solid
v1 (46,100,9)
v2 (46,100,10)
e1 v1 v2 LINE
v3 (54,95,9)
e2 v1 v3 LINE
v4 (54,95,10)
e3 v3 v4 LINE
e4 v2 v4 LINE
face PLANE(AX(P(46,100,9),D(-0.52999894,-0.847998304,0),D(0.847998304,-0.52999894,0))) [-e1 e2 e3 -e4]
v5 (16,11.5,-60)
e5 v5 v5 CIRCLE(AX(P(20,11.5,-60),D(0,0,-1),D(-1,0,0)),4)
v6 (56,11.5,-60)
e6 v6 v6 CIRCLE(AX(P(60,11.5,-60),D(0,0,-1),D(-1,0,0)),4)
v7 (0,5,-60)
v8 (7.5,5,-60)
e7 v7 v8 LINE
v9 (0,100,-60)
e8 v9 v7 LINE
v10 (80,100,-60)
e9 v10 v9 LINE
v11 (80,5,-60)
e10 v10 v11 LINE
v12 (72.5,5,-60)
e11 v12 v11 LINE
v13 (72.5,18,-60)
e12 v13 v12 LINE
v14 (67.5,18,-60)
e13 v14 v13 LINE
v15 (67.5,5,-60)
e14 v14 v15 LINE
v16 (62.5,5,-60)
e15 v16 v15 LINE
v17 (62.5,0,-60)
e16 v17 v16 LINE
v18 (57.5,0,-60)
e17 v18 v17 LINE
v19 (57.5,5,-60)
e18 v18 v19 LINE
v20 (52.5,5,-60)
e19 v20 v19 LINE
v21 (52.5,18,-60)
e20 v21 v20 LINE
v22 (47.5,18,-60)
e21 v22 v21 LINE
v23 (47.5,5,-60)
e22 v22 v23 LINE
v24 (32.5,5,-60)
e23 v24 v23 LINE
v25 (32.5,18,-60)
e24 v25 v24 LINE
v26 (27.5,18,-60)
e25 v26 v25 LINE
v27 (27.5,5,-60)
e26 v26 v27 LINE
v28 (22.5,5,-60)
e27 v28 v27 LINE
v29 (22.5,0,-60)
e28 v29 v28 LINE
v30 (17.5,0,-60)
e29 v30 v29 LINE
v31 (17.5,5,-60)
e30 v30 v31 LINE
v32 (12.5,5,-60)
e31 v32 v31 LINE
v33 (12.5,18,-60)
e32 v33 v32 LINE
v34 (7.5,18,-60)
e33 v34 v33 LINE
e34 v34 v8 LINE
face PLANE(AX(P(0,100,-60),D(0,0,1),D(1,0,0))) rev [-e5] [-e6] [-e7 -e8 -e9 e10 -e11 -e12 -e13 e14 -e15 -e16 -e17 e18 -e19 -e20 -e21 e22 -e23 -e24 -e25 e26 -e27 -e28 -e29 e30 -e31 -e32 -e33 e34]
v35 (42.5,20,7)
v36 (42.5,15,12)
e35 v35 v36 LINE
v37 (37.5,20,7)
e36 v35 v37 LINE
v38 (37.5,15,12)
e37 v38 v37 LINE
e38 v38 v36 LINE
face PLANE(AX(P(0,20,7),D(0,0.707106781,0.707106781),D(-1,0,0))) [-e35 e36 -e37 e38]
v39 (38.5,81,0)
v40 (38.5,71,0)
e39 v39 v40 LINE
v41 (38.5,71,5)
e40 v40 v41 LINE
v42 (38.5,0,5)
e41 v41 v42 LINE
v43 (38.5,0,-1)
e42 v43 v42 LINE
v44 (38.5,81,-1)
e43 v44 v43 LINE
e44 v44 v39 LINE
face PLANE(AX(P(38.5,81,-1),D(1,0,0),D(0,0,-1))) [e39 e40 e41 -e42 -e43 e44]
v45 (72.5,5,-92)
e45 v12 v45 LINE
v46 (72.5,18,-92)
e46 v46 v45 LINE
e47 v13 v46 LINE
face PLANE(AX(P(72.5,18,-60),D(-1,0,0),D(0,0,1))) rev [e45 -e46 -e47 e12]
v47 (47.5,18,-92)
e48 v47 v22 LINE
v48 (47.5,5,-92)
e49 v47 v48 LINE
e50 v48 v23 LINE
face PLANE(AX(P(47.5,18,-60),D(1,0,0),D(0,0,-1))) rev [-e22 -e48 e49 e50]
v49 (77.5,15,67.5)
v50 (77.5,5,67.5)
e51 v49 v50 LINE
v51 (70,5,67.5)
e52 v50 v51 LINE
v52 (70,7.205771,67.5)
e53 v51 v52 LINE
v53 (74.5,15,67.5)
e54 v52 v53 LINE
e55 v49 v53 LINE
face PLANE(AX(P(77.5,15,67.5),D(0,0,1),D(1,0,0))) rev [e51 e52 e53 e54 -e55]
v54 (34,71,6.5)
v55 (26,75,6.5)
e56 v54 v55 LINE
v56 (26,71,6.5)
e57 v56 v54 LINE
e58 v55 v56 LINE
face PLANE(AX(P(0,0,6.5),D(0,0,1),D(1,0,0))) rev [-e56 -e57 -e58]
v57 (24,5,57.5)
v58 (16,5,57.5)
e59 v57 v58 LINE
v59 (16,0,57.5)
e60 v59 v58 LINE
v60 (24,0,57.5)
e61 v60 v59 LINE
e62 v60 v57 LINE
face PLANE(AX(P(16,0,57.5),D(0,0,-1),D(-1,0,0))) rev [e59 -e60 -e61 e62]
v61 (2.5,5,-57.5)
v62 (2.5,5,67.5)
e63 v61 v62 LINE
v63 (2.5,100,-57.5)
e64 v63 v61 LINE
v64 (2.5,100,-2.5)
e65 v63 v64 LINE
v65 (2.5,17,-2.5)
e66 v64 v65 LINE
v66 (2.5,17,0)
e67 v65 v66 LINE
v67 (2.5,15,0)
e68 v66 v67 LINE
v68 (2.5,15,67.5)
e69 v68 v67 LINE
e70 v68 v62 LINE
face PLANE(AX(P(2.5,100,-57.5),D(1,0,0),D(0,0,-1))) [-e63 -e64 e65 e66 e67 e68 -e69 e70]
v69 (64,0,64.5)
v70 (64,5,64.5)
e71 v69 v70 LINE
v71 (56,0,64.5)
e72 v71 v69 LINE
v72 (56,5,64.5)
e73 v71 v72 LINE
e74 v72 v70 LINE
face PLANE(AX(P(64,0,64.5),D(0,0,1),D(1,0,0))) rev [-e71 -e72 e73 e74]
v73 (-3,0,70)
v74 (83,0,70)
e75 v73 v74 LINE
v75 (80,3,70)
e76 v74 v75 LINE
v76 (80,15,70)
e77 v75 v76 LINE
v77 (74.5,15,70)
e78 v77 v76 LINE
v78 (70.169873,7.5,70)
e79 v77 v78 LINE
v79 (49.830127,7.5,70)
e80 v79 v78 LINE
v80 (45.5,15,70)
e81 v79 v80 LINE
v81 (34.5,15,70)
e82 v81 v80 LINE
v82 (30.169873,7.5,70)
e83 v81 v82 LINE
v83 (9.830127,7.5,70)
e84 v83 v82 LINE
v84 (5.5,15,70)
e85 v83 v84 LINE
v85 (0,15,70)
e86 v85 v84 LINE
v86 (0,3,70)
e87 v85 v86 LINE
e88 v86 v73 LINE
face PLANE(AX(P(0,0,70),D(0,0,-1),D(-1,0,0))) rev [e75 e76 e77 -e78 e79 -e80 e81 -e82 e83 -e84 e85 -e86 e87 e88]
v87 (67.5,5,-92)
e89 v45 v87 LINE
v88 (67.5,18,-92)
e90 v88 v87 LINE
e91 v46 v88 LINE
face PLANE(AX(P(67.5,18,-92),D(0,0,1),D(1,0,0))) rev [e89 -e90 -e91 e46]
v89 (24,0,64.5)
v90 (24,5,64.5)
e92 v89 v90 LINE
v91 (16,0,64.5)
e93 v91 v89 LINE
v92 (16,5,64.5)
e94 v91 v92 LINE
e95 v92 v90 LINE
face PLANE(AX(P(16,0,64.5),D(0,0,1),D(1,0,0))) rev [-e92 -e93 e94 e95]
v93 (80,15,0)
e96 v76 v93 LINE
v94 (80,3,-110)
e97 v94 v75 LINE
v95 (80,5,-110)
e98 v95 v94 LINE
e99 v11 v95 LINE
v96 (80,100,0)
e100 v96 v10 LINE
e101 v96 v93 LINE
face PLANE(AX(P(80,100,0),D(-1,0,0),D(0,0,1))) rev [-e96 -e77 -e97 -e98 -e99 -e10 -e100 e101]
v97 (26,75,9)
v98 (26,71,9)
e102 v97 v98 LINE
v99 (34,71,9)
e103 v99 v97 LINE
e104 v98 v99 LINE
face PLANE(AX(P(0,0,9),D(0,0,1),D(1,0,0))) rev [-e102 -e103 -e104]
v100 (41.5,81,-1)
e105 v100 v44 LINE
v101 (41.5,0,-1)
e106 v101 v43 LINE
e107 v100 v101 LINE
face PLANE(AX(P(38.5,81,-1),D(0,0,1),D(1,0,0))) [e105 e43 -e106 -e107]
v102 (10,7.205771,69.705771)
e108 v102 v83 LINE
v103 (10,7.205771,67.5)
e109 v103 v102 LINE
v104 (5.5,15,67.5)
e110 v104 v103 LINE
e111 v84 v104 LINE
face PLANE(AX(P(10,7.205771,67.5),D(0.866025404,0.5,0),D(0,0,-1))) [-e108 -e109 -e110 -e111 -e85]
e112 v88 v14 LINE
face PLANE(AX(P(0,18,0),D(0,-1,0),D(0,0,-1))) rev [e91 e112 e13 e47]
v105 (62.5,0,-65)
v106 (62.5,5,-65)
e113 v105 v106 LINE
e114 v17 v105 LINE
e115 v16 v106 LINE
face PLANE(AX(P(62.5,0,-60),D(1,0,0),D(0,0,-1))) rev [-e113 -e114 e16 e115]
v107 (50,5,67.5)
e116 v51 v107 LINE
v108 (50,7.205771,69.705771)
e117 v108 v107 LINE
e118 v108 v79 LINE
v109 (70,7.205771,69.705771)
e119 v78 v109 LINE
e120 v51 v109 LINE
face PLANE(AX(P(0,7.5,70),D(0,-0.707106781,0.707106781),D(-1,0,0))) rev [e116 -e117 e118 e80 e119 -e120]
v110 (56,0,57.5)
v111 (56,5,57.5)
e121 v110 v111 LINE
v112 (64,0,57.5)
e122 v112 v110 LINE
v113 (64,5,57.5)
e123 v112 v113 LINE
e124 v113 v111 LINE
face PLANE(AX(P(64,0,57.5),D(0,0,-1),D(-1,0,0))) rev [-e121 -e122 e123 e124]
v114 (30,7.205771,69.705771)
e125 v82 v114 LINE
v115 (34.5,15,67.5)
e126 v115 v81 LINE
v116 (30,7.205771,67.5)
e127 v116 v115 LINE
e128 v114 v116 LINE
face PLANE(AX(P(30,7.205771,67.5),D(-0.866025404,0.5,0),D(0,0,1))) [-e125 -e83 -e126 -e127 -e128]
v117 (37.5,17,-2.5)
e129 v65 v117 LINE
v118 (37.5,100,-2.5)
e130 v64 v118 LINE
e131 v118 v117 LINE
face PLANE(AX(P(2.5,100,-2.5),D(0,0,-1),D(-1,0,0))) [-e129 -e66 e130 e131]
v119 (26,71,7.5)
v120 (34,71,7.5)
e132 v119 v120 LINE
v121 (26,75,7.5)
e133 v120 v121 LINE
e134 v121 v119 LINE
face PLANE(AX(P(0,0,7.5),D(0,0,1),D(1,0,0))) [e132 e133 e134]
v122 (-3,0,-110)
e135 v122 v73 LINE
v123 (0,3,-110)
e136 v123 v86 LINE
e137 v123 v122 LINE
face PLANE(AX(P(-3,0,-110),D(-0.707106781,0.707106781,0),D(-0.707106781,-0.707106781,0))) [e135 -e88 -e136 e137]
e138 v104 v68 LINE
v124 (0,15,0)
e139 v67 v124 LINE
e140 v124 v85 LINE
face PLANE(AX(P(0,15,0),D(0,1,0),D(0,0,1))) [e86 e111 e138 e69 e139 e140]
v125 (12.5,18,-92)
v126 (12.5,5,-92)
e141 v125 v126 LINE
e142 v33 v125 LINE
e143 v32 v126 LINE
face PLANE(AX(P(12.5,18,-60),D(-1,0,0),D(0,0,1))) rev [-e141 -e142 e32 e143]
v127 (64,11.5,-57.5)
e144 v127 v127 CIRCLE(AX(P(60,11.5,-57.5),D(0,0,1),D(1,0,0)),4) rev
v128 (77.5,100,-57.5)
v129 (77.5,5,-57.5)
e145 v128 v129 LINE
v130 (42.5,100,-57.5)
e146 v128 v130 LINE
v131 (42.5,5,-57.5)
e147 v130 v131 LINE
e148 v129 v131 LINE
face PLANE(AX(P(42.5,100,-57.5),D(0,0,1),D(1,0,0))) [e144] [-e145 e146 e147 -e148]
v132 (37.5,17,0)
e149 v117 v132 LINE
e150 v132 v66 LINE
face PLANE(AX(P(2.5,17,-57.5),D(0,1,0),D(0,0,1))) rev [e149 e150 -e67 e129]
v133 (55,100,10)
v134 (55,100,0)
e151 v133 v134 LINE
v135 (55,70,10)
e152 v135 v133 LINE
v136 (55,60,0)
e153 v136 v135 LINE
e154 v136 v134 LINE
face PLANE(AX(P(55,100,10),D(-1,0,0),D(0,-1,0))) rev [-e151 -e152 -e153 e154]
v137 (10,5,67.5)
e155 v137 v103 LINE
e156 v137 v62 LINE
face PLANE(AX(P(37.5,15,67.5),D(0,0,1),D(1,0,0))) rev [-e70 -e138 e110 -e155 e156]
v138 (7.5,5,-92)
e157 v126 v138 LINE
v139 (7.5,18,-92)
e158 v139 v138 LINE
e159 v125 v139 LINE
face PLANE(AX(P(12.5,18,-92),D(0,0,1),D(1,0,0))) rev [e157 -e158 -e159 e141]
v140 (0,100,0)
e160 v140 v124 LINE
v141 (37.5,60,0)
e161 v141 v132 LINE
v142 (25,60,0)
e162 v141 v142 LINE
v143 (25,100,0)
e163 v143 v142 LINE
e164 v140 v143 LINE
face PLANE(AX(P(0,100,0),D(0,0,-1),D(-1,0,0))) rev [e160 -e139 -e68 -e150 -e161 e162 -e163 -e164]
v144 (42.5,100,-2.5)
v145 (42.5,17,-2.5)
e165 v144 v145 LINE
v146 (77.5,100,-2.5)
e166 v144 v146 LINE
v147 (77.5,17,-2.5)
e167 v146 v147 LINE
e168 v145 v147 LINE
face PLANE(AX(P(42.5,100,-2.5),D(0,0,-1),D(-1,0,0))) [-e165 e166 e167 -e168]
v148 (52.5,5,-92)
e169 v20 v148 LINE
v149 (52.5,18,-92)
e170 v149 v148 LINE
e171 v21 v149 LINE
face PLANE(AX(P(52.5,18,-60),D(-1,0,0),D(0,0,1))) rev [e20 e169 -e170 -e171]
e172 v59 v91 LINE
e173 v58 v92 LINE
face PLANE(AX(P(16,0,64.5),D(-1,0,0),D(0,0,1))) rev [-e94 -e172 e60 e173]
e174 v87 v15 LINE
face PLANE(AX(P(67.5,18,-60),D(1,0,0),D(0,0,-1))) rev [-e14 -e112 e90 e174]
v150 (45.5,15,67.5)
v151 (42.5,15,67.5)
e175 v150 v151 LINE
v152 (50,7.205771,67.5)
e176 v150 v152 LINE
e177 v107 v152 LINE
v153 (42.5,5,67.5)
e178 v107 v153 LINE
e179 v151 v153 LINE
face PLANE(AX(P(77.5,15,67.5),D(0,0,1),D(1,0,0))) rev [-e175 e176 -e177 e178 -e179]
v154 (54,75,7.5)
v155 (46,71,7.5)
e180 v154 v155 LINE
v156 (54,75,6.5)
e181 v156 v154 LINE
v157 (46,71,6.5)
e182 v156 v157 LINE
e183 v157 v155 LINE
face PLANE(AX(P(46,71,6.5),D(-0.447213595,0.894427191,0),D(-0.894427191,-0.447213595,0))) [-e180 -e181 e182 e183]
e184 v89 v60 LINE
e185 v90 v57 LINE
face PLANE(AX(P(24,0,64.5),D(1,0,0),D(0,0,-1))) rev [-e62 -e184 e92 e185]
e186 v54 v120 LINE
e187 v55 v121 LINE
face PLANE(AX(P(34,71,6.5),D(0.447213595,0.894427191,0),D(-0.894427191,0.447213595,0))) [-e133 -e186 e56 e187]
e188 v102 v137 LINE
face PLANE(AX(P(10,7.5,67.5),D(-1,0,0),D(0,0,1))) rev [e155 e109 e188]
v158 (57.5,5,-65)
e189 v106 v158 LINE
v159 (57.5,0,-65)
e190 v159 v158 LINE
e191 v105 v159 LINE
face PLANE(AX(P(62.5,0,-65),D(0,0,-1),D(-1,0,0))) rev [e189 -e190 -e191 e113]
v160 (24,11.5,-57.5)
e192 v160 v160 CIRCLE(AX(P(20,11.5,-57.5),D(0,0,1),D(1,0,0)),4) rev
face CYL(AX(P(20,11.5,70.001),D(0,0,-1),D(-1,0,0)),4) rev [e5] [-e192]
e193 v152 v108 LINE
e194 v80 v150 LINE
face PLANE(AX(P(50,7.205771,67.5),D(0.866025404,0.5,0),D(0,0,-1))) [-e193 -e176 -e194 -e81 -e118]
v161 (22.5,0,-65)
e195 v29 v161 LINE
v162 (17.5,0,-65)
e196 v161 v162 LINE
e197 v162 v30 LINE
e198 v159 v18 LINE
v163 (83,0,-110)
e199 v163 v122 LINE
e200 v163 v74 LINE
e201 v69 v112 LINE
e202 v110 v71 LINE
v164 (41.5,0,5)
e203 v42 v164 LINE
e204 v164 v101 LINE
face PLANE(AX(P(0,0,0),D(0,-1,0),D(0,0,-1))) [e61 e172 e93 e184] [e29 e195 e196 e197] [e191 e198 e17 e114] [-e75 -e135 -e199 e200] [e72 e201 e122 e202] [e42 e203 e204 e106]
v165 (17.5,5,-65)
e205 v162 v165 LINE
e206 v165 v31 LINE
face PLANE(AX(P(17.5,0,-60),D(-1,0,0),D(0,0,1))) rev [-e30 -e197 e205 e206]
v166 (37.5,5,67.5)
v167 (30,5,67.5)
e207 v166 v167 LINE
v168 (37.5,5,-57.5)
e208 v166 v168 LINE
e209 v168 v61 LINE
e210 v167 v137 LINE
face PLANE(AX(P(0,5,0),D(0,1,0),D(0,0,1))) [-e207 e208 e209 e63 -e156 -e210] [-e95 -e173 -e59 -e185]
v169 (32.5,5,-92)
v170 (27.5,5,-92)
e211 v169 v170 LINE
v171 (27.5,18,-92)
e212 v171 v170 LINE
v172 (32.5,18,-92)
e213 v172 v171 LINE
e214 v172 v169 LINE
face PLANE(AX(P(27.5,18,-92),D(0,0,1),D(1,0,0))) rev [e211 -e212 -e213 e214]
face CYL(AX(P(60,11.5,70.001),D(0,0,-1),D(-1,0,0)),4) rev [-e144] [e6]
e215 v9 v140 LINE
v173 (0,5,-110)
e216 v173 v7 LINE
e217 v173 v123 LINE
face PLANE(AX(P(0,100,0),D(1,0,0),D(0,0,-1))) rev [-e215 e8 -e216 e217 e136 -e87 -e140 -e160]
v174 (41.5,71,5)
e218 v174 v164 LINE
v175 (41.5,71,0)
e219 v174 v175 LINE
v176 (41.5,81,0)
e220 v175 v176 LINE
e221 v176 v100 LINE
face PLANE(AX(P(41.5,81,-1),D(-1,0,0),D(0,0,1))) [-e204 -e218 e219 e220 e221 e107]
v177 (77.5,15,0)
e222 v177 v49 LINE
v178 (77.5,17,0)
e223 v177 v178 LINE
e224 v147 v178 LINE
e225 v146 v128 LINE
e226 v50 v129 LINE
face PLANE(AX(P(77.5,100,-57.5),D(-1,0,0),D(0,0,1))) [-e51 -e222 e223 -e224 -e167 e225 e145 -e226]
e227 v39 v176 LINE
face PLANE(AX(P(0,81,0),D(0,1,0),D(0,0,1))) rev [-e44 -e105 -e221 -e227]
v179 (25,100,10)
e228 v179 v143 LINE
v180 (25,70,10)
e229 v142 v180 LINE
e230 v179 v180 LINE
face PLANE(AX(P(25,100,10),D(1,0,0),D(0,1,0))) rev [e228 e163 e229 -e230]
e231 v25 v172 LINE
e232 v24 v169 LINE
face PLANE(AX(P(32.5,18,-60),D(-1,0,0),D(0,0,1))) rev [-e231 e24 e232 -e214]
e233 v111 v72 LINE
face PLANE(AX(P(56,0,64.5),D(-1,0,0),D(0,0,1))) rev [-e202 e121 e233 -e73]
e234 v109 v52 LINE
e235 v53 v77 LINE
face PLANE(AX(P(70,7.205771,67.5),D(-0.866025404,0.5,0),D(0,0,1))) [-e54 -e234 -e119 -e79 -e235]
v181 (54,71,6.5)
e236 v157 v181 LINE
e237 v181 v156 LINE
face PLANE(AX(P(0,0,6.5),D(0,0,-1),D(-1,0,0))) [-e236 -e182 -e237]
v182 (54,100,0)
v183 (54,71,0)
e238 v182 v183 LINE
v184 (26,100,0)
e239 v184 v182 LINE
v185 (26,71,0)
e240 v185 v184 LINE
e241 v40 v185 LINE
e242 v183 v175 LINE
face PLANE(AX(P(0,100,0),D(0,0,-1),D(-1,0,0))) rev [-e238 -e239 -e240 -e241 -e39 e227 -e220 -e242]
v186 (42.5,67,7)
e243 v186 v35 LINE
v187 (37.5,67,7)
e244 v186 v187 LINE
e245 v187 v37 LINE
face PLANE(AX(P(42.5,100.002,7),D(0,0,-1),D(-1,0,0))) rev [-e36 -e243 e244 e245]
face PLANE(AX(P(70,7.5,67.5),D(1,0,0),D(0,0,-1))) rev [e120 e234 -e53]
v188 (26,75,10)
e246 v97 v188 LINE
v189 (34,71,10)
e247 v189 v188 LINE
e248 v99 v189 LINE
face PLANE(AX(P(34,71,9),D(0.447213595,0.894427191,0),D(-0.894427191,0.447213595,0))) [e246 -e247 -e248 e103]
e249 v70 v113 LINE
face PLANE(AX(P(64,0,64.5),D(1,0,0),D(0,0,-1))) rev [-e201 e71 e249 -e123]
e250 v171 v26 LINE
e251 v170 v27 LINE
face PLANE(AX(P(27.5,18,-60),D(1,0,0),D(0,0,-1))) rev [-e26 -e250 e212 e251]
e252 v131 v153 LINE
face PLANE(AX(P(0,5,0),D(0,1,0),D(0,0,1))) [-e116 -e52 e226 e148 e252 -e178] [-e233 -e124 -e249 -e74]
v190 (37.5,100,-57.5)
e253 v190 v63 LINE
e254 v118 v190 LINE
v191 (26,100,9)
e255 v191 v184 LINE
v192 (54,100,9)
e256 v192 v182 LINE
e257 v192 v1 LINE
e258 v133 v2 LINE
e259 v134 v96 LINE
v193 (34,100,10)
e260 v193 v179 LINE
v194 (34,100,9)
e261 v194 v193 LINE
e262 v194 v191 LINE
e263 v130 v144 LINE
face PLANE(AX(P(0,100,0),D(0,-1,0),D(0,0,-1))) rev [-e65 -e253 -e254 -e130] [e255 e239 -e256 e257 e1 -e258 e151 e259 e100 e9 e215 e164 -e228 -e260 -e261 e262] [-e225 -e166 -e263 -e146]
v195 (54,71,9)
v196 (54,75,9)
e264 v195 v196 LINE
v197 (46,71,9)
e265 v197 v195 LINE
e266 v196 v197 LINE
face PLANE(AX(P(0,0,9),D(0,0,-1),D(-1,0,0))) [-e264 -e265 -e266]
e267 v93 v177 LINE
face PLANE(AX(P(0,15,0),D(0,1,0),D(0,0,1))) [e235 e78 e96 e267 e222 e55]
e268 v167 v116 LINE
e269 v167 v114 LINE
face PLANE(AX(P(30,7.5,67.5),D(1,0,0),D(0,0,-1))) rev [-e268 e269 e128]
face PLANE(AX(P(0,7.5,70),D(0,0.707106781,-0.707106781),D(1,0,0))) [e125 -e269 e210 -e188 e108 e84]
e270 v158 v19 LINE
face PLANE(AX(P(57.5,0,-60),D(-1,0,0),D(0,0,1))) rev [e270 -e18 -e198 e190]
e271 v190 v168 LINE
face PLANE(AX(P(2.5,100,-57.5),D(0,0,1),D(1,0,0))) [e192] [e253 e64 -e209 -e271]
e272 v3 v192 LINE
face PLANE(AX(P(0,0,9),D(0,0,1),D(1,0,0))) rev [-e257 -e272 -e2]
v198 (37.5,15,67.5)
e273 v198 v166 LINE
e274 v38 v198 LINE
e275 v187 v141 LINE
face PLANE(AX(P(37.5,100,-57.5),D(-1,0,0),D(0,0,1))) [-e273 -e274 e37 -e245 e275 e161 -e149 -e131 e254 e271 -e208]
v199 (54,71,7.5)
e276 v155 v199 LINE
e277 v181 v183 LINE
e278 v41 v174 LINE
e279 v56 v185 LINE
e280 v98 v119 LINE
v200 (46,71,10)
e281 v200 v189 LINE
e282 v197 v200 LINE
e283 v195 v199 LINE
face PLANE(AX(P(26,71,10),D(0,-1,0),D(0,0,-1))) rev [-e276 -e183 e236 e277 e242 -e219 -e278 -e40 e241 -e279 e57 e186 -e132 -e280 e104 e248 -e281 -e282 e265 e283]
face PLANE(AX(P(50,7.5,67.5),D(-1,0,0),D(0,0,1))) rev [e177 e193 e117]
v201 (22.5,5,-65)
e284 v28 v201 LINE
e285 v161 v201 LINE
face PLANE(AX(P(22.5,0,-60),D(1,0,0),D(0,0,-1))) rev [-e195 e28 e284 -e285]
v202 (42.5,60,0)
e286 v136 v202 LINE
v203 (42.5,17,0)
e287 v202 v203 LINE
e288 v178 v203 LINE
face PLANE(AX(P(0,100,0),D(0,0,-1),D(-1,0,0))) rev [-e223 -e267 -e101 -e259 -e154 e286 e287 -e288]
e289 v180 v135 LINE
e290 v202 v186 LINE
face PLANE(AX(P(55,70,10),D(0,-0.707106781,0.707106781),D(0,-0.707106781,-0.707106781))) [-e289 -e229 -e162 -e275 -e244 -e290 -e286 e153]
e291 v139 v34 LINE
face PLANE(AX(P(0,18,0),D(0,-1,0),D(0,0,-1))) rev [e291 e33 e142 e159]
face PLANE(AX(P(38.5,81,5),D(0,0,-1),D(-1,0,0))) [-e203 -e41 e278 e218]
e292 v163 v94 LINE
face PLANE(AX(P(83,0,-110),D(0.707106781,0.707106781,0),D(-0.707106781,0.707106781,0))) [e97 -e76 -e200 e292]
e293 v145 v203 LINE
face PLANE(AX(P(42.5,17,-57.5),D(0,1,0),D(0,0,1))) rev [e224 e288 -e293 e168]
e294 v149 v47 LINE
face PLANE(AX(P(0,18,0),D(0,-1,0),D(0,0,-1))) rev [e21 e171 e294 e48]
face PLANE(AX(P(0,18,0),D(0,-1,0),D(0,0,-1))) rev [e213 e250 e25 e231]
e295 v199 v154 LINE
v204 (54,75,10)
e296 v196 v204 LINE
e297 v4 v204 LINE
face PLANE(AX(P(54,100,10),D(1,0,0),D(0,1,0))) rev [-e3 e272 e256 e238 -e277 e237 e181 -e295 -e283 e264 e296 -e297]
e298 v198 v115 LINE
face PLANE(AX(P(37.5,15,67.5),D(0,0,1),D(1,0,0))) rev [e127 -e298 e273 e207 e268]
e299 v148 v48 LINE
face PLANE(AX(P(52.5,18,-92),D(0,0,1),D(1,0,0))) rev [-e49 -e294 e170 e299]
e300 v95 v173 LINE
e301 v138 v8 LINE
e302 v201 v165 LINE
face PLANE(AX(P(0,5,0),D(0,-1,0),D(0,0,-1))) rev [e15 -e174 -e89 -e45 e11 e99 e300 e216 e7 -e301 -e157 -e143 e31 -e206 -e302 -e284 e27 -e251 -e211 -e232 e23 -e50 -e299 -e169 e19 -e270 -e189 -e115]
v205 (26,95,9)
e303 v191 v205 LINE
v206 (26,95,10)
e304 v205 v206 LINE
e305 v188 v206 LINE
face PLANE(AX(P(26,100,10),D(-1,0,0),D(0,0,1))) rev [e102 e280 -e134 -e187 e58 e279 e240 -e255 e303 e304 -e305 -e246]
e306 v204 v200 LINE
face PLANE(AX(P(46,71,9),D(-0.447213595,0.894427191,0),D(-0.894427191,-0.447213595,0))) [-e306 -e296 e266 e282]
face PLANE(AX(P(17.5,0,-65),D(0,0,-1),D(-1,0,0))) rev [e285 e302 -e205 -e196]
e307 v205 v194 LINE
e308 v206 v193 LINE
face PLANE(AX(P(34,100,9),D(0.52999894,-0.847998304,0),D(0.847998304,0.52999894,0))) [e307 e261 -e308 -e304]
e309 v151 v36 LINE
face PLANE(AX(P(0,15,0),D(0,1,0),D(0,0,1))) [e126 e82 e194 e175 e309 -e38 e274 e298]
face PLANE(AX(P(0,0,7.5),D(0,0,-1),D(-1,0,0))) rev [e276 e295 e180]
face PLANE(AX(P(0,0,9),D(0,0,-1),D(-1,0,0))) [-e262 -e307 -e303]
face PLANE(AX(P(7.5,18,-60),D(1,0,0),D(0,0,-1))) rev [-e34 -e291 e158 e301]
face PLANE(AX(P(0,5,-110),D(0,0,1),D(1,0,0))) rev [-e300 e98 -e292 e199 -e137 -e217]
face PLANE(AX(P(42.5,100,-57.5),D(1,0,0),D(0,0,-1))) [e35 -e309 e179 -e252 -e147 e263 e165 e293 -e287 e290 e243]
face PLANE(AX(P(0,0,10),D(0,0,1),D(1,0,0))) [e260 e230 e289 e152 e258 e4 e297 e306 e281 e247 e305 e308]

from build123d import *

# Parameters (mm, degrees)
SKETCH1_W                                 = 80
SKETCH1_H                                 = 60
BOSS_EXTRUDE1_DEPTH                       = 100
CUT_EXTRUDE1_START                        = 5
SKETCH2_W                                 = 35
SKETCH2_H                                 = 55
CUT_EXTRUDE1_DEPTH                        = 95
SKETCH3_W                                 = 80
SKETCH3_H                                 = 5
BOSS_EXTRUDE2_DEPTH                       = 70
BOSS_EXTRUDE3_DEPTH                       = 10
SKETCH5_W                                 = 20
SKETCH5_H                                 = 2.5
CUT_EXTRUDE2_DEPTH                        = 7.5
SKETCH6_W                                 = 35
SKETCH6_H                                 = 12
CUT_EXTRUDE4_DEPTH                        = 57.5
CUT_EXTRUDE6_REACH                        = 184.483
SKETCH7_R                                 = 4
SKETCH9_W                                 = 80
SKETCH9_H                                 = 50
BOSS_EXTRUDE4_DEPTH                       = 5
SKETCH13_W                                = 8
SKETCH13_H                                = 7
CUT_EXTRUDE8_BUTTON_HOLES_DEPTH           = 166.90660023
BOSS_EXTRUDE5_OLED_MOUNT_DEPTH            = 10
BOSS_EXTRUDE6_OLED_MOUNT_DEPTH            = 1
BOSS_EXTRUDE7_START                       = -2.5
BOSS_EXTRUDE7_OLED_MOUNT_DEPTH            = 1
BOSS_EXTRUDE8_OLED_MOUNT_DEPTH            = 1
BOSS_EXTRUDE13_OLED_MOUNT_SUPPORT_DEPTH   = 30
CUT_EXTRUDE9_OLED_CABLE_DEPTH             = 10
CUT_EXTRUDE9_OLED_CABLE_DEPTH_BACK        = 154.430766146
SKETCH18_W                                = 3
SKETCH18_H                                = 6
BOSS_EXTRUDE12_OLED_CABLE_GUIDE_REACH     = 162.39
SKETCH20_W                                = 5
SKETCH20_H                                = 5
CUT_EXTRUDE10_SOLENOID_WIRE_HOLE_DEPTH    = 166.90660023
SKETCH21_W                                = 5
SKETCH21_H                                = 32
BOSS_EXTRUDE9_SOLENOID_SIDE_SUPPORT_DEPTH = 13
CHAMFER3_THUMB_SIZE                       = 2.5
CHAMFER5_THUMB_SIZE                       = 4.5
CHAMFER5_THUMB_SIZE2                      = 7.794228634
CHAMFER5_THUMB_PART_2_SIZE                = 4.5
CHAMFER5_THUMB_PART_2_SIZE2               = 7.794228634
CHAMFER5_THUMB_PART_3_SIZE                = 4.5
CHAMFER5_THUMB_PART_3_SIZE2               = 7.794228634
BOSS_EXTRUDE5_GUIDE_DEPTH                 = 180
SKETCH49_W                                = 5
SKETCH49_H                                = 5
BOSS_EXTRUDE14_DEPTH                      = 5
CHAMFER8_SIZE                             = 5


with BuildPart() as part:
    # Sketch1 → Boss-Extrude1 (new body)
    with BuildSketch(Plane(origin=(0, 0, 0), x_dir=(1, 0, 0), z_dir=(0, 1, 0))):
        with Locations((40, 30)):
            Rectangle(SKETCH1_W, SKETCH1_H)
    extrude(amount=BOSS_EXTRUDE1_DEPTH)

    # Sketch2 → Cut-Extrude1 (cut)
    with BuildSketch(Plane(origin=(0, 0, 0), x_dir=(1, 0, 0), z_dir=(0, 1, 0)).offset(CUT_EXTRUDE1_START)):
        with Locations((20, 30)):
            Rectangle(SKETCH2_W, SKETCH2_H)
        with Locations((60, 30)):
            Rectangle(SKETCH2_W, SKETCH2_H)
    extrude(amount=CUT_EXTRUDE1_DEPTH, mode=Mode.SUBTRACT)

    # Sketch3 → Boss-Extrude2 (add)
    with BuildSketch(Plane.XY):
        with Locations((40, 2.5)):
            Rectangle(SKETCH3_W, SKETCH3_H)
    extrude(amount=BOSS_EXTRUDE2_DEPTH)

    # Sketch4 → Boss-Extrude3 (add)
    with BuildSketch(Plane(origin=(0, 5, 0), x_dir=(1, 0, 0), z_dir=(0, 1, 0))):
        Polygon((80, 0), (77.5, 0), (77.5, -67.5), (42.5, -67.5), (42.5, 0), (37.5, 0), (37.5, -67.5), (2.5, -67.5), (2.5, 0), (0, 0), (0, -70), (80, -70), align=None)
    extrude(amount=BOSS_EXTRUDE3_DEPTH)

    # Sketch5 → Cut-Extrude2 (cut)
    with BuildSketch(Plane(origin=(0, 15, 0), x_dir=(1, 0, 0), z_dir=(0, 1, 0))):
        with Locations((20, -68.75)):
            Rectangle(SKETCH5_W, SKETCH5_H)
        with Locations((60, -68.75)):
            Rectangle(SKETCH5_W, SKETCH5_H)
    extrude(amount=-CUT_EXTRUDE2_DEPTH, mode=Mode.SUBTRACT)

    # Sketch6 → Cut-Extrude4 (cut)
    with BuildSketch(Plane.XY):
        with Locations((20, 11)):
            Rectangle(SKETCH6_W, SKETCH6_H)
        with Locations((60, 11)):
            Rectangle(SKETCH6_W, SKETCH6_H)
    extrude(amount=-CUT_EXTRUDE4_DEPTH, mode=Mode.SUBTRACT)

    # Sketch7 → Cut-Extrude6 (cut, up to next)
    with BuildSketch(Plane(origin=(0, 0, -60), x_dir=(-1, 0, 0), z_dir=(0, 0, -1)), mode=Mode.PRIVATE) as cut_extrude6_sk1:
        with Locations((-20, 11.5)):
            Circle(SKETCH7_R)
    cut_extrude6_tool1 = extrude(cut_extrude6_sk1.sketch, amount=-CUT_EXTRUDE6_REACH, mode=Mode.PRIVATE) & part.part
    # Sketch7 → Cut-Extrude6 (cut, up to next)
    with BuildSketch(Plane(origin=(0, 0, -60), x_dir=(-1, 0, 0), z_dir=(0, 0, -1)), mode=Mode.PRIVATE) as cut_extrude6_sk2:
        with Locations((-60, 11.5)):
            Circle(SKETCH7_R)
    cut_extrude6_tool2 = extrude(cut_extrude6_sk2.sketch, amount=-CUT_EXTRUDE6_REACH, mode=Mode.PRIVATE) & part.part
    add(cut_extrude6_tool1.solids().sort_by_distance((20, 11.5, -60))[0], mode=Mode.SUBTRACT)
    add(cut_extrude6_tool2.solids().sort_by_distance((60, 11.5, -60))[0], mode=Mode.SUBTRACT)

    # Sketch9 → Boss-Extrude4 (add)
    with BuildSketch(Plane(origin=(0, 0, 0), x_dir=(1, 0, 0), z_dir=(0, 1, 0))):
        with Locations((40, 85)):
            Rectangle(SKETCH9_W, SKETCH9_H)
    extrude(amount=BOSS_EXTRUDE4_DEPTH)

    # Sketch13 → Cut-Extrude8 (Button Holes) (cut, through all)
    with BuildSketch(Plane(origin=(0, 5, 0), x_dir=(1, 0, 0), z_dir=(0, 1, 0))):
        with Locations((20, -61)):
            Rectangle(SKETCH13_W, SKETCH13_H)
        with Locations((60, -61)):
            Rectangle(SKETCH13_W, SKETCH13_H)
    extrude(amount=-CUT_EXTRUDE8_BUTTON_HOLES_DEPTH, mode=Mode.SUBTRACT)

    # Sketch14 → Boss-Extrude5 (OLED Mount) (add)
    with BuildSketch(Plane.XY):
        Polygon((25, 100), (26, 100), (26, 71), (54, 71), (54, 100), (55, 100), (55, 70), (54, 70), (26, 70), (25, 70), align=None)
    extrude(amount=BOSS_EXTRUDE5_OLED_MOUNT_DEPTH)

    # Sketch15 → Boss-Extrude6 (OLED Mount) (add)
    with BuildSketch(Plane.XY.offset(10)):
        Polygon((26, 71), (34, 71), (26, 75), align=None)
        Polygon((54, 75), (54, 71), (46, 71), align=None)
    extrude(amount=-BOSS_EXTRUDE6_OLED_MOUNT_DEPTH)

    # Sketch15<2> → Boss-Extrude7 (OLED Mount) (add)
    with BuildSketch(Plane.XY.offset(10).offset(BOSS_EXTRUDE7_START)):
        Polygon((26, 71), (34, 71), (26, 75), align=None)
        Polygon((54, 75), (54, 71), (46, 71), align=None)
    extrude(amount=-BOSS_EXTRUDE7_OLED_MOUNT_DEPTH)

    # Sketch17 → Boss-Extrude8 (OLED Mount) (add)
    with BuildSketch(Plane.XY.offset(10)):
        Polygon((54, 95), (54, 100), (46, 100), align=None)
        Polygon((26, 100), (34, 100), (26, 95), align=None)
    extrude(amount=-BOSS_EXTRUDE8_OLED_MOUNT_DEPTH)

    # Sketch32 → Boss-Extrude13 OLED Mount Support) (add)
    with BuildSketch(Plane.ZY.offset(-25)):
        Polygon((0, 70), (10, 70), (0, 60), align=None)
    extrude(amount=-BOSS_EXTRUDE13_OLED_MOUNT_SUPPORT_DEPTH)

    # Sketch18 → Cut-Extrude9 (OLED Cable) (cut, two sides: drawn at the far end of the back side and taken through both)
    with BuildSketch(Plane(origin=(0, 71, 0), x_dir=(1, 0, 0), z_dir=(0, 1, 0)).offset(-CUT_EXTRUDE9_OLED_CABLE_DEPTH_BACK)):
        with Locations((40, -2)):
            Rectangle(SKETCH18_W, SKETCH18_H)
    extrude(amount=CUT_EXTRUDE9_OLED_CABLE_DEPTH + CUT_EXTRUDE9_OLED_CABLE_DEPTH_BACK, mode=Mode.SUBTRACT)

    # Boss-Extrude12 (OLED Cable Guide): up to this plane
    boss_extrude12_oled_cable_guide_end = Plane(origin=(55, 70, 10), z_dir=(0, -0.7071067811865477, 0.7071067811865474))
    # Sketch31 → Boss-Extrude12 (OLED Cable Guide) (add, up to the surface)
    with BuildSketch(Plane(origin=(0, 15, 0), x_dir=(1, 0, 0), z_dir=(0, 1, 0)), mode=Mode.PRIVATE) as boss_extrude12_oled_cable_guide_sk1:
        Polygon((37.5, 0), (38.5, 0), (38.5, -5), (41.5, -5), (41.5, 0), (42.5, 0), (42.5, -7), (37.5, -7), align=None)
    boss_extrude12_oled_cable_guide_tool1 = split(extrude(boss_extrude12_oled_cable_guide_sk1.sketch, amount=BOSS_EXTRUDE12_OLED_CABLE_GUIDE_REACH, mode=Mode.PRIVATE), bisect_by=boss_extrude12_oled_cable_guide_end, keep=Keep.BOTH, mode=Mode.PRIVATE)
    add(boss_extrude12_oled_cable_guide_tool1.solids().sort_by_distance((38, 15, 0.086023))[0])

    # Sketch20 → Cut-Extrude10 (Solenoid Wire Hole) (cut, through all)
    with BuildSketch(Plane(origin=(0, 5, 0), x_dir=(1, 0, 0), z_dir=(0, 1, 0))):
        with Locations((60, 62.5)):
            Rectangle(SKETCH20_W, SKETCH20_H)
        with Locations((20, 62.5)):
            Rectangle(SKETCH20_W, SKETCH20_H)
    extrude(amount=-CUT_EXTRUDE10_SOLENOID_WIRE_HOLE_DEPTH, mode=Mode.SUBTRACT)

    # Sketch21 → Boss-Extrude9 (Solenoid Side Support) (add)
    with BuildSketch(Plane(origin=(0, 5, 0), x_dir=(1, 0, 0), z_dir=(0, 1, 0))):
        with Locations((70, 76)):
            Rectangle(SKETCH21_W, SKETCH21_H)
        with Locations((50, 76)):
            Rectangle(SKETCH21_W, SKETCH21_H)
        with Locations((30, 76)):
            Rectangle(SKETCH21_W, SKETCH21_H)
        with Locations((10, 76)):
            Rectangle(SKETCH21_W, SKETCH21_H)
    extrude(amount=BOSS_EXTRUDE9_SOLENOID_SIDE_SUPPORT_DEPTH)

    # Chamfer3 (Thumb)
    chamfer3_thumb_edges = [part.edges().sort_by_distance(p)[0] for p in [
        (20, 7.5, 67.5),
        (60, 7.5, 67.5),
    ]]
    chamfer(chamfer3_thumb_edges, length=CHAMFER3_THUMB_SIZE - 0.0001)  # a hair under: the kernel refuses the full size

    # Chamfer5 (Thumb)
    chamfer5_thumb_edges = [part.edges().sort_by_distance(p)[0] for p in [
        (70, 15, 68.75),
    ]]
    chamfer5_thumb_side = [part.faces().sort_by_distance(p)[0] for p in [
        (78.266129032, 15, 38.266129032),
    ]]
    chamfer(chamfer5_thumb_edges, length=CHAMFER5_THUMB_SIZE, length2=CHAMFER5_THUMB_SIZE2, reference=chamfer5_thumb_side[0])

    # Chamfer5 (Thumb) part 2
    chamfer5_thumb_part_2_edges = [part.edges().sort_by_distance(p)[0] for p in [
        (50, 15, 68.75),
        (30, 15, 68.75),
    ]]
    chamfer5_thumb_part_2_side = [part.faces().sort_by_distance(p)[0] for p in [
        (40, 15, 41.718085106),
    ]]
    chamfer(chamfer5_thumb_part_2_edges, length=CHAMFER5_THUMB_PART_2_SIZE, length2=CHAMFER5_THUMB_PART_2_SIZE2, reference=chamfer5_thumb_part_2_side[0])

    # Chamfer5 (Thumb) part 3
    chamfer5_thumb_part_3_edges = [part.edges().sort_by_distance(p)[0] for p in [
        (10, 15, 68.75),
    ]]
    chamfer5_thumb_part_3_side = [part.faces().sort_by_distance(p)[0] for p in [
        (1.733870968, 15, 38.266129032),
    ]]
    chamfer(chamfer5_thumb_part_3_edges, length=CHAMFER5_THUMB_PART_3_SIZE, length2=CHAMFER5_THUMB_PART_3_SIZE2, reference=chamfer5_thumb_part_3_side[0])

    # Sketch37 → Boss-Extrude5 (Guide) (add, through all)
    with BuildSketch(Plane.XY.offset(70)):
        Polygon((80, 0), (83, 0), (80, 3), align=None)
        Polygon((0, 0), (-3, 0), (0, 3), align=None)
    extrude(amount=-BOSS_EXTRUDE5_GUIDE_DEPTH)

    # Sketch49 → Boss-Extrude14 (add)
    with BuildSketch(Plane(origin=(0, 15, 0), x_dir=(1, 0, 0), z_dir=(0, 1, 0))):
        with Locations((40, -9.5)):
            Rectangle(SKETCH49_W, SKETCH49_H)
    extrude(amount=BOSS_EXTRUDE14_DEPTH)

    # Chamfer8
    chamfer8_edges = [part.edges().sort_by_distance(p)[0] for p in [
        (40, 20, 12),
    ]]
    chamfer(chamfer8_edges, length=CHAMFER8_SIZE - 0.0001)  # a hair under: the kernel refuses the full size


solid = part.part
